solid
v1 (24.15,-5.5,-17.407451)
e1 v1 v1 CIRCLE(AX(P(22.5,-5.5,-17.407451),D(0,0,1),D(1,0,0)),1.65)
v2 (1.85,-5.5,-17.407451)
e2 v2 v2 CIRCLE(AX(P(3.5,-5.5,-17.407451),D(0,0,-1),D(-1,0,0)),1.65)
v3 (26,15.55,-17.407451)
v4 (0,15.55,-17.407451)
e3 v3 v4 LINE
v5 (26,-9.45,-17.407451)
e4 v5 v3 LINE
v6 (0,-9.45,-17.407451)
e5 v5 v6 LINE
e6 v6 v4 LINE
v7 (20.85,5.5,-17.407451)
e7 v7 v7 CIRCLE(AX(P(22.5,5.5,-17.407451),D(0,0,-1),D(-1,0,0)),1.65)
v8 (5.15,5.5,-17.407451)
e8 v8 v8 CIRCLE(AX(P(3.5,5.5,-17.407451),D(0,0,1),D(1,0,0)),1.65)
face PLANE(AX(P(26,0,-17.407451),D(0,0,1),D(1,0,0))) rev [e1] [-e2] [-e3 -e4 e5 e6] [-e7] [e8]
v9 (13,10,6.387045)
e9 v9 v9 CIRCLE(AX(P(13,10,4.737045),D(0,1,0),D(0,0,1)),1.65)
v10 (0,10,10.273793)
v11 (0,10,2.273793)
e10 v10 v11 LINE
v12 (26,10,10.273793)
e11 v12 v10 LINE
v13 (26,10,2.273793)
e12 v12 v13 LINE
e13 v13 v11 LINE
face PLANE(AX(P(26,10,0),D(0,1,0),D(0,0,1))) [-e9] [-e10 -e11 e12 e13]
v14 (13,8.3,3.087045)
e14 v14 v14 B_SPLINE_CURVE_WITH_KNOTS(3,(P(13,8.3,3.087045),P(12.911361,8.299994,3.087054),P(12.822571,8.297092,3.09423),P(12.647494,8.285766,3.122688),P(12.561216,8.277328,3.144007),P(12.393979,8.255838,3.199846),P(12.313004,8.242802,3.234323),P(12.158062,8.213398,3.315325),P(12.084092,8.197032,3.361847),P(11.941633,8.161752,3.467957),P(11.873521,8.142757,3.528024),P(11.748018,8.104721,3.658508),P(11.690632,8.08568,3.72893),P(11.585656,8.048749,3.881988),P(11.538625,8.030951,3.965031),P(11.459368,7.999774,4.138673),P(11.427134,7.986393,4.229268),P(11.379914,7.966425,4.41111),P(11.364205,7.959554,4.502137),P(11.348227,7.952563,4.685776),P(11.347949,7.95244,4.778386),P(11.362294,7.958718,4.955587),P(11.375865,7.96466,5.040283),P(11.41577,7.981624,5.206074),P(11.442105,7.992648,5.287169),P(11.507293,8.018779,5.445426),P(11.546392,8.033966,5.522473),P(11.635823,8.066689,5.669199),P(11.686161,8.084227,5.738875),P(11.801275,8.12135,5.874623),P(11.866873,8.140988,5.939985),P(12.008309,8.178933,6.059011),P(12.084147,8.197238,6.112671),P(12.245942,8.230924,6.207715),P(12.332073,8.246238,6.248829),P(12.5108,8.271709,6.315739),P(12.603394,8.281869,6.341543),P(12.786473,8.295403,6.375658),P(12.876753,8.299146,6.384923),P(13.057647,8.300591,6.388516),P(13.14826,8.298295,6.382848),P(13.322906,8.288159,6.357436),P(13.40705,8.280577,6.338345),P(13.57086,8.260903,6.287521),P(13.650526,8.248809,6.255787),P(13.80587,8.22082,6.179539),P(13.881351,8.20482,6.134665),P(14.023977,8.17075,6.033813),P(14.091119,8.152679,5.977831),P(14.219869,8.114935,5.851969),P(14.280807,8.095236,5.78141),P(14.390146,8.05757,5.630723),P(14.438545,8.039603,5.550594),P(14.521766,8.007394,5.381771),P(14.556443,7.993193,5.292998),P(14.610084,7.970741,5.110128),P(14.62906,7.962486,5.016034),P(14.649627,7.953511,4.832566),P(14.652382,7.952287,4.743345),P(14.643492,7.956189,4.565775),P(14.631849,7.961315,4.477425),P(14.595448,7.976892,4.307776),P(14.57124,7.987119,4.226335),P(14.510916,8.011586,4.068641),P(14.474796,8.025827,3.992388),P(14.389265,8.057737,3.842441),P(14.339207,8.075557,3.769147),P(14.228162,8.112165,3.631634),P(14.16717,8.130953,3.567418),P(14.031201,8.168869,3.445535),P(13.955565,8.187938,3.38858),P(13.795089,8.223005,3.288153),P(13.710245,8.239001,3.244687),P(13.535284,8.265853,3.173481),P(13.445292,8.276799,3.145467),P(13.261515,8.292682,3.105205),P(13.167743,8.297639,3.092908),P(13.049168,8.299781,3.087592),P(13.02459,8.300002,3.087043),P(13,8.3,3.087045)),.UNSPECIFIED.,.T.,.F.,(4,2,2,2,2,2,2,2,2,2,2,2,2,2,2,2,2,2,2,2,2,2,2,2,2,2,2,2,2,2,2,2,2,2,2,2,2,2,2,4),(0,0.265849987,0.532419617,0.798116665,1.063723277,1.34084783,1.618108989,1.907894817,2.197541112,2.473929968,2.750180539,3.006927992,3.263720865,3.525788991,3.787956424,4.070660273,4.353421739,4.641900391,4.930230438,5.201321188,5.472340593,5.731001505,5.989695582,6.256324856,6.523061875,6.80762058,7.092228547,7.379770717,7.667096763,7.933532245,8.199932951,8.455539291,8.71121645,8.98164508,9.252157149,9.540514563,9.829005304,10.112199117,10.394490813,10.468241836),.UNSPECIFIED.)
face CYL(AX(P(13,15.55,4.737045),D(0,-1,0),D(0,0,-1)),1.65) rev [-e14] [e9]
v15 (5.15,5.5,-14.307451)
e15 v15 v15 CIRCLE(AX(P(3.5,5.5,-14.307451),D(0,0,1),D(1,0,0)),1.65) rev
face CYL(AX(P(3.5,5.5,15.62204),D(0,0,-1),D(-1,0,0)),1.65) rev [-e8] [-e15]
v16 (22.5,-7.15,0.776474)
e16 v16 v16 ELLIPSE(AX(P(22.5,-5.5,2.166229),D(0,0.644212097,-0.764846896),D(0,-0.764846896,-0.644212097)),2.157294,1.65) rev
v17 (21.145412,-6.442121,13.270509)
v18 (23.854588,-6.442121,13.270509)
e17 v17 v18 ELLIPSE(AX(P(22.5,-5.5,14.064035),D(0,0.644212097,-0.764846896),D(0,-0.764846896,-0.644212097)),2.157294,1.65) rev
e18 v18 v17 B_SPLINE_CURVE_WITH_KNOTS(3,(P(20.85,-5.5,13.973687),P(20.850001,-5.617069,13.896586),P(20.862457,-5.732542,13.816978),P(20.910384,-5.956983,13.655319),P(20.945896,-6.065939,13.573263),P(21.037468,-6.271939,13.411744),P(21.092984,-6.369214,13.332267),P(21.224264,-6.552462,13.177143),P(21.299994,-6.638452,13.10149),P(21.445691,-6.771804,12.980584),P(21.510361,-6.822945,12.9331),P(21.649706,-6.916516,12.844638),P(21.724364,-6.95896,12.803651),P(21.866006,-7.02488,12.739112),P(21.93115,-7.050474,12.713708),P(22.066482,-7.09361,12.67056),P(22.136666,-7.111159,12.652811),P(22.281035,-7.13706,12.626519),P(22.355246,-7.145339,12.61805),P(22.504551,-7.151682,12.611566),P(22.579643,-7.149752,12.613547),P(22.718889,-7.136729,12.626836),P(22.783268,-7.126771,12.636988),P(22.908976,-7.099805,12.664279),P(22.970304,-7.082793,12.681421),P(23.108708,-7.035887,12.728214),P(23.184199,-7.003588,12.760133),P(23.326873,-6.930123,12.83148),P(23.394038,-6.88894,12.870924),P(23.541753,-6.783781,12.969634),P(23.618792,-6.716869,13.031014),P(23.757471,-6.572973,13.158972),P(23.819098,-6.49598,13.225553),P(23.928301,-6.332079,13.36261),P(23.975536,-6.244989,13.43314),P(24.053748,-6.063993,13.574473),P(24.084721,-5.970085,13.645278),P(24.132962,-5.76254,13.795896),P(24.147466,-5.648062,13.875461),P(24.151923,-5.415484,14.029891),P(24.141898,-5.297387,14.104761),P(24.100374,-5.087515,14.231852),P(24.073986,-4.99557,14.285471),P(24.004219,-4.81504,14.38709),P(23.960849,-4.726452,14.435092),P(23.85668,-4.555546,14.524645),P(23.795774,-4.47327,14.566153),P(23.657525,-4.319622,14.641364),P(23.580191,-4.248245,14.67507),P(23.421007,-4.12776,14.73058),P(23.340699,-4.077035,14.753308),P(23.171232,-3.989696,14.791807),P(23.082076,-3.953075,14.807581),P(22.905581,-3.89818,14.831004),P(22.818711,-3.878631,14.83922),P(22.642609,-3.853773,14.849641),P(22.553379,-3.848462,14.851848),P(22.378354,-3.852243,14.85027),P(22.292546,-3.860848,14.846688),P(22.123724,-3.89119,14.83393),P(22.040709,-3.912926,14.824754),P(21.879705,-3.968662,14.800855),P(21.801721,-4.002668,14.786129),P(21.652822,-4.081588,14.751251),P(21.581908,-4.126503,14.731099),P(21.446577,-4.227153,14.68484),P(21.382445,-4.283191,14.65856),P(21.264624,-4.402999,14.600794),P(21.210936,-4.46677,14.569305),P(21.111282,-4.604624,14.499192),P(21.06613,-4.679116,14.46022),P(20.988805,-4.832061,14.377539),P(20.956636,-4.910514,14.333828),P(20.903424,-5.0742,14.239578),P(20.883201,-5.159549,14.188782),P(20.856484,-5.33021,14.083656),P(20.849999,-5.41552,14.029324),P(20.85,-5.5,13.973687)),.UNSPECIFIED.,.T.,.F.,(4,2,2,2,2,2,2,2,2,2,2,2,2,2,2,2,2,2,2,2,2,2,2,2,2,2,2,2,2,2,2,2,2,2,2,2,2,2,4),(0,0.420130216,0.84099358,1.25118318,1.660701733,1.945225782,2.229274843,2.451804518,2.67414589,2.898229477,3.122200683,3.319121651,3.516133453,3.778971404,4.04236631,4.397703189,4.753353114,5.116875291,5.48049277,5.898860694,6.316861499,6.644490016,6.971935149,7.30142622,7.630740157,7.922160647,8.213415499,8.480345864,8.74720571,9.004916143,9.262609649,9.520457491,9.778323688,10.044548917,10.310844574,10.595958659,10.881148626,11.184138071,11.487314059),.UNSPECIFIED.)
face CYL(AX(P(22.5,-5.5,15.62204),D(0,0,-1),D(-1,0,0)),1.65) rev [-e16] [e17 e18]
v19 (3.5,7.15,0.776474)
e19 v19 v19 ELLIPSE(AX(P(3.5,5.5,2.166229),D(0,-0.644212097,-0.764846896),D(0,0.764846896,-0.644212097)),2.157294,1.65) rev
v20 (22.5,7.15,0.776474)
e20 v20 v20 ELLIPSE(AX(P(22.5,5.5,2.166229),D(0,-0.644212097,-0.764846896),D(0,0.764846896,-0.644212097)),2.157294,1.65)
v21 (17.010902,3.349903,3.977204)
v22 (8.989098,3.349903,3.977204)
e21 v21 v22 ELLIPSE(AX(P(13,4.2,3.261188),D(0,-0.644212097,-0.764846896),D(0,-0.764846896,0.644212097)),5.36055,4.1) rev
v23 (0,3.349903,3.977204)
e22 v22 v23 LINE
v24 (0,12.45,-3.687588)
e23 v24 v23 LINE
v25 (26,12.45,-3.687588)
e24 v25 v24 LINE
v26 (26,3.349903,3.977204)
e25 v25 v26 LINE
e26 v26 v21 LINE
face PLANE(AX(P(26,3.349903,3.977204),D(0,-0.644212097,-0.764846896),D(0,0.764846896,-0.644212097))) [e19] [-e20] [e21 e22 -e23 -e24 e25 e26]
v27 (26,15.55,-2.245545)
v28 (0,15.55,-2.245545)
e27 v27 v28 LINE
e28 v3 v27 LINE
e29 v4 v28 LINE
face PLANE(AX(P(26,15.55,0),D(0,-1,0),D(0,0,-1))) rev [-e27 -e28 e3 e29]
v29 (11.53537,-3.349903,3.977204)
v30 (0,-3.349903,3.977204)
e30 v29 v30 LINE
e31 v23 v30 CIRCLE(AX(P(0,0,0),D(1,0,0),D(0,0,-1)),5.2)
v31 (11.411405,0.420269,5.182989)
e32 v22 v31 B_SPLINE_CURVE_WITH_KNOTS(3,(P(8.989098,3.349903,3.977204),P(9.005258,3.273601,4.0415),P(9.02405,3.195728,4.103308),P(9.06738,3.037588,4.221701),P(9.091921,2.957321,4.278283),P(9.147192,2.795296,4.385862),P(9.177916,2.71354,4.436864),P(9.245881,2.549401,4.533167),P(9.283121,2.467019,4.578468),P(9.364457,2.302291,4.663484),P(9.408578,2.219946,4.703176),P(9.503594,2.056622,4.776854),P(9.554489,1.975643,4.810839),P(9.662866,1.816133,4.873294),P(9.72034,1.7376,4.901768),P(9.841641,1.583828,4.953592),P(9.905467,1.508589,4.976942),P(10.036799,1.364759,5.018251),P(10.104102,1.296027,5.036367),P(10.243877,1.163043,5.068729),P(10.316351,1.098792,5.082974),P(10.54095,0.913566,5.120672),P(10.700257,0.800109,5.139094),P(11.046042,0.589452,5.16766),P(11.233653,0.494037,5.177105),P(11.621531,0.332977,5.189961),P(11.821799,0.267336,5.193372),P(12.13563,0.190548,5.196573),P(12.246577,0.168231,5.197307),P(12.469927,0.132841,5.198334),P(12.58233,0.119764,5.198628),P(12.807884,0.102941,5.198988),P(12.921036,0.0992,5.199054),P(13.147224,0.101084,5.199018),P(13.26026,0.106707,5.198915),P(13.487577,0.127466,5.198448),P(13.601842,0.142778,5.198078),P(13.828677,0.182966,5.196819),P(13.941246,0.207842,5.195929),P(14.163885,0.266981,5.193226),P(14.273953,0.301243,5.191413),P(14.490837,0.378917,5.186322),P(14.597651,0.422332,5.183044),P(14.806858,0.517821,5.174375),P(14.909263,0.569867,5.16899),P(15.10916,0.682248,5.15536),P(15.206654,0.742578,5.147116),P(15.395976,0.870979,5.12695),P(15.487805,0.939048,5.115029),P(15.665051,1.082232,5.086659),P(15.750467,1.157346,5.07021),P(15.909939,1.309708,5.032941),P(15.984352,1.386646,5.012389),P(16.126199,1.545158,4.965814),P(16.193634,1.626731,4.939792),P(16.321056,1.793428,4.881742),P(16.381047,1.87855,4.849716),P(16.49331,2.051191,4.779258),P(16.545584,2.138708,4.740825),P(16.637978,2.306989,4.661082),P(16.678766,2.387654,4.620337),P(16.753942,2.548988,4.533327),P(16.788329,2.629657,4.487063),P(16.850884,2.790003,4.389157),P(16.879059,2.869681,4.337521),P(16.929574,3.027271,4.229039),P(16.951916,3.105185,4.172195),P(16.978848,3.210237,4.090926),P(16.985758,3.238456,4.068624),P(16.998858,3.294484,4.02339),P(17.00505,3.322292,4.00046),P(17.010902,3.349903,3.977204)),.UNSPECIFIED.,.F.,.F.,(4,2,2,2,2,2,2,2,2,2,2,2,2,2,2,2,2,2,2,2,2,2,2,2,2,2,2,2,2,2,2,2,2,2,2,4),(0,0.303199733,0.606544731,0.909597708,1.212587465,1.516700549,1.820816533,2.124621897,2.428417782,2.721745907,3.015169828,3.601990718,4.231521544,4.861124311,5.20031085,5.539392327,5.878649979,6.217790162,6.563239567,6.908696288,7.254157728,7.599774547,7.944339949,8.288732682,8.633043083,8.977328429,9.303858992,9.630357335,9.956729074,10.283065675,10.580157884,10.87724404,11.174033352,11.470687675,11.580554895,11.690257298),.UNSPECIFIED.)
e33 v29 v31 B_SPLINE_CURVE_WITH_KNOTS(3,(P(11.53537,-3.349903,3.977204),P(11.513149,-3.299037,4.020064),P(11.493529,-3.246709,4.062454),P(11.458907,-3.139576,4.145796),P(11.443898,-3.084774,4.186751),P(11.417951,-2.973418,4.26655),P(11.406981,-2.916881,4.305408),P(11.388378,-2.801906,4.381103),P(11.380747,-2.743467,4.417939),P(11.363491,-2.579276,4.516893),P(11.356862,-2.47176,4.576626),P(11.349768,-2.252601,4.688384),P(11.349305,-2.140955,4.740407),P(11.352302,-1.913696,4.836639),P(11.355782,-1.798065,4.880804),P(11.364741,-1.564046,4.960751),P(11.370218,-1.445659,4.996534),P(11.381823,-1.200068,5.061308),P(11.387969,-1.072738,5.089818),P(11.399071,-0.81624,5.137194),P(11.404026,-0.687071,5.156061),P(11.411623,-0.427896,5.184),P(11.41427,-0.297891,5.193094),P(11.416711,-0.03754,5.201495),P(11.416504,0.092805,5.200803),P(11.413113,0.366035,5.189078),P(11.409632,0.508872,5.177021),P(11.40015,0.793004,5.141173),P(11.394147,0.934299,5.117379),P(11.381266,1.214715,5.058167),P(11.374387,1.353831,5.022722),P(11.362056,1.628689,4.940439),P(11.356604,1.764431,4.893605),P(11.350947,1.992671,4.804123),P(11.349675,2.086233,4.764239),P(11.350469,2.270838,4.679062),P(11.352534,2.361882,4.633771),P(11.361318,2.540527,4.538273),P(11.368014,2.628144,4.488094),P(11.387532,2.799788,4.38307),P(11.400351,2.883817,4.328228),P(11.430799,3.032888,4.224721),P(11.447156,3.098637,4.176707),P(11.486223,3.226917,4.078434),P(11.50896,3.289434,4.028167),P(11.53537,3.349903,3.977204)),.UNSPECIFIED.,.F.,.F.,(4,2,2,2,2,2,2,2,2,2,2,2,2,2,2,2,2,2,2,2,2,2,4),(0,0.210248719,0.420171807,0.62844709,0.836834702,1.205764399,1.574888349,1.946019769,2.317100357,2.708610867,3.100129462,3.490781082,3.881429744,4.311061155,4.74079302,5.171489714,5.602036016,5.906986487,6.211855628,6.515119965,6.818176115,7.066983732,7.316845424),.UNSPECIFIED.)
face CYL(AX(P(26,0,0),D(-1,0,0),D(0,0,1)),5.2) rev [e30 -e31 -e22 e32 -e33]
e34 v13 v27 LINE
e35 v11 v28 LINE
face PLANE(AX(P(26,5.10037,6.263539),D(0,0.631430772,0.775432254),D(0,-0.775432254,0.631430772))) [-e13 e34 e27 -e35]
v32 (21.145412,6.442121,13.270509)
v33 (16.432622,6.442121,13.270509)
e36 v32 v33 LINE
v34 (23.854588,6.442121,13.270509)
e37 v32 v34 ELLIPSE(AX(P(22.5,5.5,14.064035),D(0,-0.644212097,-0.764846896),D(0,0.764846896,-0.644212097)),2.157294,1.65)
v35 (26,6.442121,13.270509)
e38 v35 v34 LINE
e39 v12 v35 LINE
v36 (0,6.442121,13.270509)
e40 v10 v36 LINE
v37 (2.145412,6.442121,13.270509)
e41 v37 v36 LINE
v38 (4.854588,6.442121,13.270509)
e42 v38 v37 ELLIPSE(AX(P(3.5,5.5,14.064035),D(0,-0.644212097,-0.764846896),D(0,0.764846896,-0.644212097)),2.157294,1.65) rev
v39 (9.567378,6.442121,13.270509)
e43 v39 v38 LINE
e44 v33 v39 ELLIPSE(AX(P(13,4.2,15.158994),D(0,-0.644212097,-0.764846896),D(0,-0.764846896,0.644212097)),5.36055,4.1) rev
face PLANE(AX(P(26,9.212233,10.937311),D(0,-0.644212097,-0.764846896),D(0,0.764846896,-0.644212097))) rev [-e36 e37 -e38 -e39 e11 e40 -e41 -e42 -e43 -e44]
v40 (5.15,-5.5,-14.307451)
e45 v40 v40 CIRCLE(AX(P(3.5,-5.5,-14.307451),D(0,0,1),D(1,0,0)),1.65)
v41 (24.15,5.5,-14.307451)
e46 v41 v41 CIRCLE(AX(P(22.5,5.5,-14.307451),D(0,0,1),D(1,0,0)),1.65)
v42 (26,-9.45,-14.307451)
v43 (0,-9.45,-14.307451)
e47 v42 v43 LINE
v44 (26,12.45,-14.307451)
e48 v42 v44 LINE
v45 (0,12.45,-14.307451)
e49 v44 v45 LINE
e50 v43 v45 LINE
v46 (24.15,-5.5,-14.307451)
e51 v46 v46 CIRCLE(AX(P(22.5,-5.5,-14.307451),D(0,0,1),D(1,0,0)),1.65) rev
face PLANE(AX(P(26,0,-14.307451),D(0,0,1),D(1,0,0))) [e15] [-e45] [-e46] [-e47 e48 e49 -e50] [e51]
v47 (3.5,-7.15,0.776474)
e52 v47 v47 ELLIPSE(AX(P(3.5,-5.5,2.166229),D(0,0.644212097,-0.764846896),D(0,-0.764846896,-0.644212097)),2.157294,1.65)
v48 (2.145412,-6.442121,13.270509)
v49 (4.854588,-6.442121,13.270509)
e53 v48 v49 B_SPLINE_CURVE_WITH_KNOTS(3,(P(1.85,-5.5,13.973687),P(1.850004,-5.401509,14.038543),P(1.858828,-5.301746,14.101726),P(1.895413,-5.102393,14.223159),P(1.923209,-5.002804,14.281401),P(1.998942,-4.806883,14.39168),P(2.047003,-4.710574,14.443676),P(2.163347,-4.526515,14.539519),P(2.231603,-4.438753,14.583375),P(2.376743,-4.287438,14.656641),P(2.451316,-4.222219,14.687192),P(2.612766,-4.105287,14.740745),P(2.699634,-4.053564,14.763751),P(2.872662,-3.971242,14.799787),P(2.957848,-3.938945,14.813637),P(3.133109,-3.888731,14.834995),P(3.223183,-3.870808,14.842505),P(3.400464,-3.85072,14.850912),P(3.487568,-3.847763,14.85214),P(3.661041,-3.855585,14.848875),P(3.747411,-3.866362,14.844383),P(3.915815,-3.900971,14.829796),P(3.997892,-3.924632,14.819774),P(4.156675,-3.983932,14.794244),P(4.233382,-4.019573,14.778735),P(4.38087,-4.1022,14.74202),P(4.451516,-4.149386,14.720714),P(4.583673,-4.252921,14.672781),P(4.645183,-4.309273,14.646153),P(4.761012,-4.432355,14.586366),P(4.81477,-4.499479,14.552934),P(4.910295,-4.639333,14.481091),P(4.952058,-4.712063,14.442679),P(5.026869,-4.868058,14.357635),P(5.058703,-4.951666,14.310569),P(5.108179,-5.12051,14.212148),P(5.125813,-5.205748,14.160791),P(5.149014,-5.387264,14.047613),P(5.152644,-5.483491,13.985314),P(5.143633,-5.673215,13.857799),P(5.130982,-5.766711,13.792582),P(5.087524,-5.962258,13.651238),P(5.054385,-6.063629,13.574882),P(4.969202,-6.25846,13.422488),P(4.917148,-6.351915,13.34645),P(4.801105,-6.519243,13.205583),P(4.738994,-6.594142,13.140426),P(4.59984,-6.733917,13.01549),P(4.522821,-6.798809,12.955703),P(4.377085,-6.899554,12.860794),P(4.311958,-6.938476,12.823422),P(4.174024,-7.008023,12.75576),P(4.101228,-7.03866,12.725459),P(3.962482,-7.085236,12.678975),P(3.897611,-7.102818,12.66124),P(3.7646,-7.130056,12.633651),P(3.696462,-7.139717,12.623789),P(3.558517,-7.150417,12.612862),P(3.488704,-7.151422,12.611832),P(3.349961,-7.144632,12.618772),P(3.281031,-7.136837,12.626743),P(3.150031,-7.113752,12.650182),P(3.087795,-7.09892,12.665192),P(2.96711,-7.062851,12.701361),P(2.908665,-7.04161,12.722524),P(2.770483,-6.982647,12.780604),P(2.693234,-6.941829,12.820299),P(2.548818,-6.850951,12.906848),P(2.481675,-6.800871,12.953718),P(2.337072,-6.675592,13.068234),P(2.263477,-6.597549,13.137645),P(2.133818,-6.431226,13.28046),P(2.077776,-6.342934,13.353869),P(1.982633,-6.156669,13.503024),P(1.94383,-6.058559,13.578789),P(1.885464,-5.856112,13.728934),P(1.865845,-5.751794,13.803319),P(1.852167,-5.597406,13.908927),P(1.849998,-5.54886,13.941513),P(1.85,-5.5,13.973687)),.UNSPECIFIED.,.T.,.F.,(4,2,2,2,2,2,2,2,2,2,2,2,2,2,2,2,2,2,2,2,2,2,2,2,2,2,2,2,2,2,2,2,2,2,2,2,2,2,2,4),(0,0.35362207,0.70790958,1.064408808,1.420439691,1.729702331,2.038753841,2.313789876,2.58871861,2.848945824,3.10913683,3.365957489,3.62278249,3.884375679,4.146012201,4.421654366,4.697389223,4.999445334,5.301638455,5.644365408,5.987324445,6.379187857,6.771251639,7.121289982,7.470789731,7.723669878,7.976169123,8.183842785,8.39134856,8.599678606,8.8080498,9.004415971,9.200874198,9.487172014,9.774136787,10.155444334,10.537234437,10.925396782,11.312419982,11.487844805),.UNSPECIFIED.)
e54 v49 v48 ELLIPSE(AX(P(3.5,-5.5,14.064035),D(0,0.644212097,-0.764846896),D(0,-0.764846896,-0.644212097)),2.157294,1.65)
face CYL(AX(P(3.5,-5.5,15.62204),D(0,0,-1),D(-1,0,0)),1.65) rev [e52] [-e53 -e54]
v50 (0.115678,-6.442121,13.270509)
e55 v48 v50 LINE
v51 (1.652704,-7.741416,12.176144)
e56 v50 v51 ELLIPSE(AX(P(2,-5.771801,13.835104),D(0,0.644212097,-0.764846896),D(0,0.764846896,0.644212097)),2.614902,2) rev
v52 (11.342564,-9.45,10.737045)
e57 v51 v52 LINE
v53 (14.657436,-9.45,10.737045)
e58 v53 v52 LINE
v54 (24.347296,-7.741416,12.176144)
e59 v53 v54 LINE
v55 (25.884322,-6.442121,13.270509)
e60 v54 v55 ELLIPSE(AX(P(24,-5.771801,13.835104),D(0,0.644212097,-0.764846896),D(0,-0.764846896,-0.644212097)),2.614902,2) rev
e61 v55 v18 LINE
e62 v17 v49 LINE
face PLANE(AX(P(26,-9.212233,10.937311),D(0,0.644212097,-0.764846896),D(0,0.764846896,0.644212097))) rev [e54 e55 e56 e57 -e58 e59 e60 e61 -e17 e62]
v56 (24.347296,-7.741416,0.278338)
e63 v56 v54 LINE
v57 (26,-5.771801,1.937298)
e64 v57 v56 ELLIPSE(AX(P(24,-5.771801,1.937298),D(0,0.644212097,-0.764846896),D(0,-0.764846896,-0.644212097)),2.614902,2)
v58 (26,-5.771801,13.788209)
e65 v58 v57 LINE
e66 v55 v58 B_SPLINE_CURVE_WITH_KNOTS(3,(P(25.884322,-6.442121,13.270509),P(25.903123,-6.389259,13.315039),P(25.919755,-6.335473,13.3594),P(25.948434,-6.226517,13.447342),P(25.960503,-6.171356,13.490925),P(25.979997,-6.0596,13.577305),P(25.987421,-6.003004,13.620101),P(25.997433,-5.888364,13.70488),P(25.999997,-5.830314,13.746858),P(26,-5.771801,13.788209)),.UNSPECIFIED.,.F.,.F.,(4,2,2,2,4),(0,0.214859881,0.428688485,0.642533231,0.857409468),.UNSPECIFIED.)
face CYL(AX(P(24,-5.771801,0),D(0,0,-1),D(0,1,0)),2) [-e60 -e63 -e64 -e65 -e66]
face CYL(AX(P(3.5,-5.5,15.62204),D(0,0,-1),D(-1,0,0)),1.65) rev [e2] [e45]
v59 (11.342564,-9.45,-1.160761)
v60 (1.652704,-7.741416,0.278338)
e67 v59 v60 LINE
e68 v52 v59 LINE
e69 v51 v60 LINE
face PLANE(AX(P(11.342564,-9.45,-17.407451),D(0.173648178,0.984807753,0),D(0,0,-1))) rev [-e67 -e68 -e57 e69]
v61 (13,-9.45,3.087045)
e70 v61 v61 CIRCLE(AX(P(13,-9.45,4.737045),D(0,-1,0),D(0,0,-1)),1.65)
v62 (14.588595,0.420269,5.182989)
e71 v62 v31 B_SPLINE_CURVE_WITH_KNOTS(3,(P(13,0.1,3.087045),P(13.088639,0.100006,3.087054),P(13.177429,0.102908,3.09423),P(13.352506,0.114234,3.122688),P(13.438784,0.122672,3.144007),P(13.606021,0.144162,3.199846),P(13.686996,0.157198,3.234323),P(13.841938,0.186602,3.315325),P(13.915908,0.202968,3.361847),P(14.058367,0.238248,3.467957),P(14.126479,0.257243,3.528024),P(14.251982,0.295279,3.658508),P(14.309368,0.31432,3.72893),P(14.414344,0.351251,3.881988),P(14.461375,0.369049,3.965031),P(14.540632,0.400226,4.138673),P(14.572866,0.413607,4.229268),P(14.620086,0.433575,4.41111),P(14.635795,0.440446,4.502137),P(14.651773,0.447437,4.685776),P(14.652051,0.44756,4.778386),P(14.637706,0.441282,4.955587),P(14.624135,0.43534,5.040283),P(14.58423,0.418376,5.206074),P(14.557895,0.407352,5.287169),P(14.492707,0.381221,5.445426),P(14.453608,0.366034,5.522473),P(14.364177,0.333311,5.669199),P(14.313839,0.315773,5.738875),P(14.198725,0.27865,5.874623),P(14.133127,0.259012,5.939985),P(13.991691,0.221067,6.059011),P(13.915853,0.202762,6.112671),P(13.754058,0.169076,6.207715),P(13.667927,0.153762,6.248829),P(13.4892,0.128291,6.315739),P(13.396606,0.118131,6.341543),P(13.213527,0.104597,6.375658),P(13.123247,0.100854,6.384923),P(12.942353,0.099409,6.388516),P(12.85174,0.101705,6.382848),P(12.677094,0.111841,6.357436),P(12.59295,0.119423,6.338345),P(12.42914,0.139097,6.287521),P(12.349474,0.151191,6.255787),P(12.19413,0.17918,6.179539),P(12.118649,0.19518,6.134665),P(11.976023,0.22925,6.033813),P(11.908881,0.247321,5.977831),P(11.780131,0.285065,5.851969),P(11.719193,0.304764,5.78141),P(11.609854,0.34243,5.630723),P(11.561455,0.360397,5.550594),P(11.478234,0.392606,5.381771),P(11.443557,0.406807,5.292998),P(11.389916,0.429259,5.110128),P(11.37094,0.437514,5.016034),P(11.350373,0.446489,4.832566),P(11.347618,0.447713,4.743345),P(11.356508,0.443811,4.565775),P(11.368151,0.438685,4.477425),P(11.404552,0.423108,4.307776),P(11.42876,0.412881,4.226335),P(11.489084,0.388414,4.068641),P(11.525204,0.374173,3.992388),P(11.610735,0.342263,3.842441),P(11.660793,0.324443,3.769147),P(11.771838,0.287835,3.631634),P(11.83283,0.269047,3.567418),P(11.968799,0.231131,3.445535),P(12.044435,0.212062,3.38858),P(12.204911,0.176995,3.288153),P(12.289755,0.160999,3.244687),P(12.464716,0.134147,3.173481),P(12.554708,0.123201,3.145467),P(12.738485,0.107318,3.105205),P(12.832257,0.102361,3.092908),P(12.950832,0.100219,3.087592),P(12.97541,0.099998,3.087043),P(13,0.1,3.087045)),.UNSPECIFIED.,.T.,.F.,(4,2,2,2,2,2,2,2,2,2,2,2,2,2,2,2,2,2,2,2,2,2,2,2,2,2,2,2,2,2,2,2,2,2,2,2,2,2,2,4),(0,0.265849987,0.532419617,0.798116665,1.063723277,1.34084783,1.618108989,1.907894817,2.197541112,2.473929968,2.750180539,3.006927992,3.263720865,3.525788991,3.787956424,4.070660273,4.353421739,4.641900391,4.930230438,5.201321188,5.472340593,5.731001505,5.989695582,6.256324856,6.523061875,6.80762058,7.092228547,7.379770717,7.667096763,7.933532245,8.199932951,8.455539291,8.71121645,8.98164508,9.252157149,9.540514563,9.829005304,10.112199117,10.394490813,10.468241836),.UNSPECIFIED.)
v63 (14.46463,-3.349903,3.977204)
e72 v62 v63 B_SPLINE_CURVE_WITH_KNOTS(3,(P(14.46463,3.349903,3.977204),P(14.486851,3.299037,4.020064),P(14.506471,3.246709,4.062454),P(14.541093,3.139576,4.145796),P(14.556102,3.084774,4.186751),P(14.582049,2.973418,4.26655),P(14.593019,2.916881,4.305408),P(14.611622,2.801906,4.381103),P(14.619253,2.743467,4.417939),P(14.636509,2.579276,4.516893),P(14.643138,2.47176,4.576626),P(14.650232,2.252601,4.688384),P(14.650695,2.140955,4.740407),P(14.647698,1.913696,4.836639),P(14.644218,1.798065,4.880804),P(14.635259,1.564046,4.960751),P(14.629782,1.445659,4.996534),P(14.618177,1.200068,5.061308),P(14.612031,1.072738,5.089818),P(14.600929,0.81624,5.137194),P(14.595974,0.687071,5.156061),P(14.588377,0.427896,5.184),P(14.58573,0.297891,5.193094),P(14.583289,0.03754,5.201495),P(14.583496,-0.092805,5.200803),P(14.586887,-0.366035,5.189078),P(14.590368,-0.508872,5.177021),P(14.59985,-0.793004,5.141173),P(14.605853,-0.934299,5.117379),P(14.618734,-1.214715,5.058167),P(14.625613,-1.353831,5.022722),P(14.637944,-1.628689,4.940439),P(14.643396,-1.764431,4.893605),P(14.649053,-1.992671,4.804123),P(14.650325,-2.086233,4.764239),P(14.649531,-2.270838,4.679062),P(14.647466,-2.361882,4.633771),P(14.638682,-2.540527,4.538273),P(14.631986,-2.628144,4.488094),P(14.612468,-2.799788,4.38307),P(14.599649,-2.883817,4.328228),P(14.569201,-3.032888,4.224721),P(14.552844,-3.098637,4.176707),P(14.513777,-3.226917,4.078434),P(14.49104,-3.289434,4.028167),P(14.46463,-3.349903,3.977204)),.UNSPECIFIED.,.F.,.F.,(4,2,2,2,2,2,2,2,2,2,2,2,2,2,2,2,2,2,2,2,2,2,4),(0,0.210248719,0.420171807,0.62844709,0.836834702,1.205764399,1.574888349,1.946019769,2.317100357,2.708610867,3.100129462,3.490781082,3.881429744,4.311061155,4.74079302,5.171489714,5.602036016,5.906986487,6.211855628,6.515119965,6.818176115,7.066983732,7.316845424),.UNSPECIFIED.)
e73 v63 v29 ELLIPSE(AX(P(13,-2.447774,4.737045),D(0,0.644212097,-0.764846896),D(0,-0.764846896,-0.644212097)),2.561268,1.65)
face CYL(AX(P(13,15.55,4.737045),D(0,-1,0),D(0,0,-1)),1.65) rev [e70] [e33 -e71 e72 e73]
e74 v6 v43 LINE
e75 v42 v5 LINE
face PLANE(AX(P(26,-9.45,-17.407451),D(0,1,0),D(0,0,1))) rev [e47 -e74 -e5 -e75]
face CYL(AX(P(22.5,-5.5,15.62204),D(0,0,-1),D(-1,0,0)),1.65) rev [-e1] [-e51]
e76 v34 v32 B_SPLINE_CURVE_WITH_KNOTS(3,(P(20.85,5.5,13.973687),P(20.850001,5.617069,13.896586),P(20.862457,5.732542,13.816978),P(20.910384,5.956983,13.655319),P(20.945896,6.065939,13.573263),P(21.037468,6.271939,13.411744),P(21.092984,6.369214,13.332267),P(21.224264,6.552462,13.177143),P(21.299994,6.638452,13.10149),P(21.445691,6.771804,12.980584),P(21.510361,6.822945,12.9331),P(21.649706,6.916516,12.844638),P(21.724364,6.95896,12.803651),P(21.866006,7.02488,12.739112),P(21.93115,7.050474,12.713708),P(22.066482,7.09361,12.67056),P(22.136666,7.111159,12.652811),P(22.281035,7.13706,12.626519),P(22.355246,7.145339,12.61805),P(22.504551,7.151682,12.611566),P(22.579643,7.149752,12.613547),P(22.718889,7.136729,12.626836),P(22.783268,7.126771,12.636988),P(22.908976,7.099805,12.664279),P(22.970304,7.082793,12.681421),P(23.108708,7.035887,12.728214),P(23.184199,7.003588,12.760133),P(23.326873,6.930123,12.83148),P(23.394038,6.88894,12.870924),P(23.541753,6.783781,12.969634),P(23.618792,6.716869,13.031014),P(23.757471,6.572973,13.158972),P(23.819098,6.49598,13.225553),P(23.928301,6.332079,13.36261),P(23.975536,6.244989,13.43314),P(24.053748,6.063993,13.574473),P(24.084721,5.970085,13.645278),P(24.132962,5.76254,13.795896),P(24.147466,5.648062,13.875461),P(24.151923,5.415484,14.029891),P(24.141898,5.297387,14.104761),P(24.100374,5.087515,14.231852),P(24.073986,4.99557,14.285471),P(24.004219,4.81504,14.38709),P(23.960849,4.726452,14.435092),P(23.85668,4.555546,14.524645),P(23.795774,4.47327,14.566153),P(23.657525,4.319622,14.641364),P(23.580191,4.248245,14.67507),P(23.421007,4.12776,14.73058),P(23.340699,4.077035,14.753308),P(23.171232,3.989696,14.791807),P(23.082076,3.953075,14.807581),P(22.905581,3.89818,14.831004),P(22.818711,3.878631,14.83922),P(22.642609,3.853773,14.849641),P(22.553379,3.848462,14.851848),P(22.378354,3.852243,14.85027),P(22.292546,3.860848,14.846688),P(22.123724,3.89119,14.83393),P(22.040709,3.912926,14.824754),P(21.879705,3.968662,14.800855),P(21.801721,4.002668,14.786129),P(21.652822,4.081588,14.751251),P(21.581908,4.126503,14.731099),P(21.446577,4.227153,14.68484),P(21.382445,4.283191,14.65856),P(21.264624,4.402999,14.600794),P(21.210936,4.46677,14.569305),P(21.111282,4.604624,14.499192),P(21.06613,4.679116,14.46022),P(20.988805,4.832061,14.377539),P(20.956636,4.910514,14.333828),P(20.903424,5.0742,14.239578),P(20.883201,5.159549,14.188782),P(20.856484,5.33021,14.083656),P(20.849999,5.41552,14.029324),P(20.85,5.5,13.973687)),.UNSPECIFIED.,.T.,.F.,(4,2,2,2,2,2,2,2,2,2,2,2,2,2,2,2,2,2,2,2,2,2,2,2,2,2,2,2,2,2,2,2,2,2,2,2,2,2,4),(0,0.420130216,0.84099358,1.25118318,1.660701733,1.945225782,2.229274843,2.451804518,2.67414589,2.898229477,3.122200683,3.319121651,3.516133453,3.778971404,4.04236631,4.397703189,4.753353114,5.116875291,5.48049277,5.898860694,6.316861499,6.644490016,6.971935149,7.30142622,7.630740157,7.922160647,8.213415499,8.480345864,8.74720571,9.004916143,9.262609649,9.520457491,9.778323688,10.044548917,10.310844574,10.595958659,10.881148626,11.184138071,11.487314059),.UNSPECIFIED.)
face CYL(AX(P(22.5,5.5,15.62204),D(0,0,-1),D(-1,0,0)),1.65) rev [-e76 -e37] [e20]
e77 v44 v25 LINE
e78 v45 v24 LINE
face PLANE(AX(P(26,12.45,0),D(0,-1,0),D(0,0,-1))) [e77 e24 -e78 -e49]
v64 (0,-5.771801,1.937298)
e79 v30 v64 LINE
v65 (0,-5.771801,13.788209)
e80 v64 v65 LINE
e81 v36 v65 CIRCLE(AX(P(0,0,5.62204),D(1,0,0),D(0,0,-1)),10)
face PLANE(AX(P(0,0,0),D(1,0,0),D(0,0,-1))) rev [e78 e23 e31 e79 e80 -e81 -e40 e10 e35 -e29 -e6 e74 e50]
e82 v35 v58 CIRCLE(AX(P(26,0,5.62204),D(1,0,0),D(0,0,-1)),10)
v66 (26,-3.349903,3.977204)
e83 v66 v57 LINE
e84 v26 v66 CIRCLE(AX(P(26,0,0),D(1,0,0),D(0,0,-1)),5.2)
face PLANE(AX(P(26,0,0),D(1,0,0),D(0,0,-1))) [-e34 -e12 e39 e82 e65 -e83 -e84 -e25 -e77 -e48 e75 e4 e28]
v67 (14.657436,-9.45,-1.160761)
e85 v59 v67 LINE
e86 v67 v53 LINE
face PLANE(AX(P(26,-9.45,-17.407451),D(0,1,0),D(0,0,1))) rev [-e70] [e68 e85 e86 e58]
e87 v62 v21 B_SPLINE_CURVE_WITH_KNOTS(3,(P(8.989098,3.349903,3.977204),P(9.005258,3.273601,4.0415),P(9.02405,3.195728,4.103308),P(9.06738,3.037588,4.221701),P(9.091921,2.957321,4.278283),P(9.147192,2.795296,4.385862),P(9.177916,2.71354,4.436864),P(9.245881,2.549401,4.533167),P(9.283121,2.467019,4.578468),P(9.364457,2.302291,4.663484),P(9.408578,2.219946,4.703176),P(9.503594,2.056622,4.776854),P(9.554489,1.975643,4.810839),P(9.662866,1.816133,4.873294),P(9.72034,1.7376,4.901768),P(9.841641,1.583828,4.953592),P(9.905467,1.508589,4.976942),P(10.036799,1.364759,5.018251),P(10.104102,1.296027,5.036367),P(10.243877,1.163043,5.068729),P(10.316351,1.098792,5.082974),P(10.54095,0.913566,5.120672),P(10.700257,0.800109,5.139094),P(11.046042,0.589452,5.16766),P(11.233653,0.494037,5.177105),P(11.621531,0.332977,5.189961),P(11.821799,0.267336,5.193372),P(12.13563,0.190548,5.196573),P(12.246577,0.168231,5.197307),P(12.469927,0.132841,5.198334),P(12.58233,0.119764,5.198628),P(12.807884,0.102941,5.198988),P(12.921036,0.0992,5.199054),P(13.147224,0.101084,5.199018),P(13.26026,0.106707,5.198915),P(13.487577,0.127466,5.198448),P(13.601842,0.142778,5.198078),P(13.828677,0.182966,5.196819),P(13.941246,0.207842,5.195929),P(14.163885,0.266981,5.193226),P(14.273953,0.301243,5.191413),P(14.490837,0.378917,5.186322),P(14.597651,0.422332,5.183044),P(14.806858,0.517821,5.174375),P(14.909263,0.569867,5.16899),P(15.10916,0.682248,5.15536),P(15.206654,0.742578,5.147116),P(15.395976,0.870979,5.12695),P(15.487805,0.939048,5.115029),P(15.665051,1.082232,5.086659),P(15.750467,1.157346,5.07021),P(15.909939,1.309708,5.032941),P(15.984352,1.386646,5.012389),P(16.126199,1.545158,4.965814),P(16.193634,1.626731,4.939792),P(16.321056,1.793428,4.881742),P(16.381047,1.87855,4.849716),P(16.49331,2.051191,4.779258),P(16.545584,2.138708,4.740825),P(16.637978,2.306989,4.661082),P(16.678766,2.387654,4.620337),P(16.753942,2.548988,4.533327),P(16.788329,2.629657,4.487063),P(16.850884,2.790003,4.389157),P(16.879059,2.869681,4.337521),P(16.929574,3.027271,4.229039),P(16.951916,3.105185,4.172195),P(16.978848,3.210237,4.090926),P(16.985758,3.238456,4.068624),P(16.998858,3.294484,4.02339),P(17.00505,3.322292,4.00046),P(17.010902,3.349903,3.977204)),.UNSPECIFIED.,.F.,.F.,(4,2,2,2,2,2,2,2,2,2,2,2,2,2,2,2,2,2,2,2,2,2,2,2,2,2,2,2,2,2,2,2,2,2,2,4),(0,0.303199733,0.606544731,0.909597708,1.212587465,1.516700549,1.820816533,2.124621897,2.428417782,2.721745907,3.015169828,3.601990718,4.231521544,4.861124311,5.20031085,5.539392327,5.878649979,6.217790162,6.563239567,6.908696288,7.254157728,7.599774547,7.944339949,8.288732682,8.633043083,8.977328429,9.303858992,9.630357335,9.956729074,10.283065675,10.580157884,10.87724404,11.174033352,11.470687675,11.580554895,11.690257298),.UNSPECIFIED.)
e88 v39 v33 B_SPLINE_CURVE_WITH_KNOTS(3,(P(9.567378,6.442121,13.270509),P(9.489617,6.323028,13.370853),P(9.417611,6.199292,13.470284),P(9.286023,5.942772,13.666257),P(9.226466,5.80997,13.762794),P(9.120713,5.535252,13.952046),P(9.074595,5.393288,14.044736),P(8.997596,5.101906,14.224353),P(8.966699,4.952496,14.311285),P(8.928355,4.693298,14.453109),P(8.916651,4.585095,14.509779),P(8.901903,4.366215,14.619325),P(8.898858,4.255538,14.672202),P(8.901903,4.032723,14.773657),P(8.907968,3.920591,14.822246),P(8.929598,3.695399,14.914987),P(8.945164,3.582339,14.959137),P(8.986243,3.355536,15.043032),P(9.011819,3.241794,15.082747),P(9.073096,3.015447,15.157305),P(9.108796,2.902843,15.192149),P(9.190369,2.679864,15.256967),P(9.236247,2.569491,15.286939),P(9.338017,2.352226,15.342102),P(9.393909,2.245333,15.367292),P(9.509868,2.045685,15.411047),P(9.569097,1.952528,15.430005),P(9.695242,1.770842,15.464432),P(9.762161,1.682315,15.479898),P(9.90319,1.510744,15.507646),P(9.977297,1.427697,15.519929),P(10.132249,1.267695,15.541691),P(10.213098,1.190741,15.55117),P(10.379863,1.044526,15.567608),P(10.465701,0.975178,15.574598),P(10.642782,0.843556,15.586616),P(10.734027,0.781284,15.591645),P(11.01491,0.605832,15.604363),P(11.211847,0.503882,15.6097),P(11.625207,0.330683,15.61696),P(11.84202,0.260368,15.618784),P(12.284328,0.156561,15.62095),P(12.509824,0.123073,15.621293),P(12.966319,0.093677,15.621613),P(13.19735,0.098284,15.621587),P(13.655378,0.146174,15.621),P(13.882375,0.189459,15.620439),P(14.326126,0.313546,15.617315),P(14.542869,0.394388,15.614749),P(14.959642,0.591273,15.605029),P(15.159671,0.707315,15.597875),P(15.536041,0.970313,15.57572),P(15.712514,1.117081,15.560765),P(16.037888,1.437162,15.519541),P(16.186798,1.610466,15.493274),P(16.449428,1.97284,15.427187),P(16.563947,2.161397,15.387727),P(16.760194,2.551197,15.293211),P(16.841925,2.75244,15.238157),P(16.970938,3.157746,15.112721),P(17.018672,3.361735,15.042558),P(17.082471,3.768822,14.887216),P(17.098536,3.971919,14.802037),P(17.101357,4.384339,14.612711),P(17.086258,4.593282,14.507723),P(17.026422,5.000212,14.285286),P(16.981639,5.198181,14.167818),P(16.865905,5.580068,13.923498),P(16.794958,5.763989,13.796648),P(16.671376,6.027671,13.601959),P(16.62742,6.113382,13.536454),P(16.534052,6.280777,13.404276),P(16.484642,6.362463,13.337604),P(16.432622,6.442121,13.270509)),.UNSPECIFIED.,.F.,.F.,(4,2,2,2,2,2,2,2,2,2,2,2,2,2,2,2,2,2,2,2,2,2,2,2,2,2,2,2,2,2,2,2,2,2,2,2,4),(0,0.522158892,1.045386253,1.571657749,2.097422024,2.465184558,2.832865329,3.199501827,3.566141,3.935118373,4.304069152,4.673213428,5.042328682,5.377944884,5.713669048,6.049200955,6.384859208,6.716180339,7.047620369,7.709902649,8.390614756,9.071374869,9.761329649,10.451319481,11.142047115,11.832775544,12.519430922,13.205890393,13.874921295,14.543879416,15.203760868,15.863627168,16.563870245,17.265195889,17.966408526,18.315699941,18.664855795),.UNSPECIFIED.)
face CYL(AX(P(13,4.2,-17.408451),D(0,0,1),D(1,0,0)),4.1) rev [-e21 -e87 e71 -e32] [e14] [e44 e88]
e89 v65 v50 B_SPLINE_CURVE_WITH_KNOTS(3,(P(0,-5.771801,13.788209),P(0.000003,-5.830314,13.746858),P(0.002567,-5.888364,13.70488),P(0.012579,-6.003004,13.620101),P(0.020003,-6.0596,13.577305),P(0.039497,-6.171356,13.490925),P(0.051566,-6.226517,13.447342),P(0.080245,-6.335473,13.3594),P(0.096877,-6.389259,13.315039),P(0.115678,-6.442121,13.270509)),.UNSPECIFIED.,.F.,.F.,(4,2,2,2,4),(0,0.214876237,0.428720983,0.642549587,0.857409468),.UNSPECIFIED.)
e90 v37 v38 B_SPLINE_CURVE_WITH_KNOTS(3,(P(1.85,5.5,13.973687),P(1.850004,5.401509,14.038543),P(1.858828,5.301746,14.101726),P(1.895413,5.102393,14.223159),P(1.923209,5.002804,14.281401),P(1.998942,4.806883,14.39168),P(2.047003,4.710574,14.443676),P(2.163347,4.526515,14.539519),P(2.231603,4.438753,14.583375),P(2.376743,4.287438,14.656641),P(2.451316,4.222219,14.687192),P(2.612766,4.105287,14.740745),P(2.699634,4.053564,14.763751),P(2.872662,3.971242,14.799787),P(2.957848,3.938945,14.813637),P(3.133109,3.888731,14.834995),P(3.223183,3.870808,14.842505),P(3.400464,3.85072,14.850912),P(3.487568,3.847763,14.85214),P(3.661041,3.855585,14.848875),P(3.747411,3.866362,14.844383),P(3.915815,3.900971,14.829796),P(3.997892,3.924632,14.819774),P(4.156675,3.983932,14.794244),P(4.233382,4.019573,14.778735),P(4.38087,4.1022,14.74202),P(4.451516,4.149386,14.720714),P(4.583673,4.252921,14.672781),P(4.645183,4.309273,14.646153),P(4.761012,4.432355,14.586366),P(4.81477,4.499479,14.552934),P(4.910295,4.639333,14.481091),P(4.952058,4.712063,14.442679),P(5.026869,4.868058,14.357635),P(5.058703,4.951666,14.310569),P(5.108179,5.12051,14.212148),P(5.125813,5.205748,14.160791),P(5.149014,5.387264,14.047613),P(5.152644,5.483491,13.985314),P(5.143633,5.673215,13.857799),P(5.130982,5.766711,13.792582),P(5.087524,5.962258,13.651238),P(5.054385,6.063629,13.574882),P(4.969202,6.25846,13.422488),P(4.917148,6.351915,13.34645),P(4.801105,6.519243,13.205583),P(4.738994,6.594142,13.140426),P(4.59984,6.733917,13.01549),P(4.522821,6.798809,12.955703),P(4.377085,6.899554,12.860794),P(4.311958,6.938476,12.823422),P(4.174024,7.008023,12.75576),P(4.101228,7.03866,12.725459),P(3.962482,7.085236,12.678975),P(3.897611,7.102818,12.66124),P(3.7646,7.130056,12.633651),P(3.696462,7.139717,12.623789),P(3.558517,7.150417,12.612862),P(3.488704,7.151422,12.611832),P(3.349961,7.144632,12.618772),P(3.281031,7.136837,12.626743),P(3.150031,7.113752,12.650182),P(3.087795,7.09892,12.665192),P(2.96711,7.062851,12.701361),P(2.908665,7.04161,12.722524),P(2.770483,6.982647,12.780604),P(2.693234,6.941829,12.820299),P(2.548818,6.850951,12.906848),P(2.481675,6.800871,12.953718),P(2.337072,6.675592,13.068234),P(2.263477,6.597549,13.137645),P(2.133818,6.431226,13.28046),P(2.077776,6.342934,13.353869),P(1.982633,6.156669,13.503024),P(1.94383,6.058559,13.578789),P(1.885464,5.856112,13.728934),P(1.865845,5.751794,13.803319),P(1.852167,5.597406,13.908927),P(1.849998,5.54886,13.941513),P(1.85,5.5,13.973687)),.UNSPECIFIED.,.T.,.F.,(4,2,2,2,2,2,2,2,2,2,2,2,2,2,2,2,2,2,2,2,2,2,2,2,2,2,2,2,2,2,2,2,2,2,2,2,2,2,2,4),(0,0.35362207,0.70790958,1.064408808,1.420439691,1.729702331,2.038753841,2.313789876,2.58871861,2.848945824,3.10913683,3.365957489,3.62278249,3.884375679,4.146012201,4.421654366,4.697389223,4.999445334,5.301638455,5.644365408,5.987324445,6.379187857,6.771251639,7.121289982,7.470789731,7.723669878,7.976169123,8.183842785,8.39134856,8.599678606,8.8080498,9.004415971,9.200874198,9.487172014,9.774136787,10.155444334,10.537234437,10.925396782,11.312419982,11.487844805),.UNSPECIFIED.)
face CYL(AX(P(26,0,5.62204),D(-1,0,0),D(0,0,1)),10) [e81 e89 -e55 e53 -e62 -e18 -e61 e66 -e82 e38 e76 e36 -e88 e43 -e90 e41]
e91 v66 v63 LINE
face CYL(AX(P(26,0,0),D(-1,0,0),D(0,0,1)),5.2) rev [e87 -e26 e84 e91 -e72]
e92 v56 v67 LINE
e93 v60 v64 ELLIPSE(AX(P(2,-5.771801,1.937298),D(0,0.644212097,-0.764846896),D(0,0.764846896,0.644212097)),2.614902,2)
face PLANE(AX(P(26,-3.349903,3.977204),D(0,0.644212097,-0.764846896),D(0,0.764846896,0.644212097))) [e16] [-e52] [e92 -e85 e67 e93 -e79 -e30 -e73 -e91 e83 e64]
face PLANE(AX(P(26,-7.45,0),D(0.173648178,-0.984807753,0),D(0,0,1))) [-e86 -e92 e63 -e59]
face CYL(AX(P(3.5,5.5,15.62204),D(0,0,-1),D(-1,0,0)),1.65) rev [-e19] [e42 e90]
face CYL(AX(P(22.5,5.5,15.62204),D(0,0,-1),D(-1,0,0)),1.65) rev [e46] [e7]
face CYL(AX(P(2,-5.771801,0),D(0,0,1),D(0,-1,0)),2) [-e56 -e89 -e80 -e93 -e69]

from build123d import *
from OCP.BRepFilletAPI import BRepFilletAPI_MakeChamfer

# Parameters (mm, degrees)
EXTRUDE_1_DEPTH     = 26
SKETCH_2_R          = 1.65
CUT_EXTRUDE_1_DEPTH = 45.819078563
SKETCH_3_W          = 28.1444964
SKETCH_3_H          = 6.1
CUT_EXTRUDE_2_DEPTH = 35.940261345
CUT_EXTRUDE_4_REACH = 46.819
SKETCH_5_R          = 4.1
SKETCH_6_R          = 1.65
CUT_EXTRUDE_5_DEPTH = 41.050210522
CHAMFER_1_SIZE      = 2
CHAMFER_1_SIZE2     = 11.342563639
FILLET_1_R          = 2


with BuildPart() as part:
    # 草图1 → 凸台-拉伸1 (new body)
    with BuildSketch(Plane(origin=(0, 0, 0), x_dir=(0, 0, -1), z_dir=(1, 0, 0))):
        with BuildLine():
            Line((17.407451211, 15.55), (2.245544981, 15.55))
            Line((2.245544981, 15.55), (-2.273793452, 10))
            Line((-2.273793452, 10), (-10.273793452, 10))
            Line((-10.273793452, 10), (-13.270509165, 6.44212097))
            ThreePointArc((-13.270509165, 6.44212097), (-15.622040206, 0), (-13.270509165, -6.44212097))
            Line((-13.270509165, -6.44212097), (-10.273793452, -10))
            Line((-10.273793452, -10), (-2.273793452, -10))
            Line((-2.273793452, -10), (2.245544981, -15.55))
            Line((2.245544981, -15.55), (17.407451211, -15.55))
            Line((17.407451211, -15.55), (17.407451211, 15.55))
        make_face()
        with BuildLine():
            Line((3.687588487, 12.45), (14.307451211, 12.45))
            Line((14.307451211, 12.45), (14.307451211, -12.45))
            Line((14.307451211, -12.45), (3.687588487, -12.45))
            Line((3.687588487, -12.45), (-3.977203858, -3.349902904))
            ThreePointArc((-3.977203858, -3.349902904), (-5.2, 0), (-3.977203858, 3.349902904))
            Line((-3.977203858, 3.349902904), (3.687588487, 12.45))
        make_face(mode=Mode.SUBTRACT)
    extrude(amount=EXTRUDE_1_DEPTH)

    # 草图2 → 切除-拉伸1 (cut, through all)
    with BuildSketch(Plane(origin=(0, 0, -17.407451211), x_dir=(-1, 0, 0), z_dir=(0, 0, -1))):
        with Locations((-22.5, 5.5)):
            Circle(SKETCH_2_R)
        with Locations(Location((-22.5, -5.5, 0), (0, 0, 325.181239638))):
            Circle(SKETCH_2_R)
        with Locations(Location((-3.5, -5.5, 0), (0, 0, 325.181239638))):
            Circle(SKETCH_2_R)
        with Locations(Location((-3.5, 5.5, 0), (0, 0, 180))):
            Circle(SKETCH_2_R)
    extrude(amount=-CUT_EXTRUDE_1_DEPTH, mode=Mode.SUBTRACT)

    # 草图3 → 切除-拉伸2 (cut, through all)
    with BuildSketch(Plane.ZY):
        with Locations((-3.335203011, -12.5)):
            Rectangle(SKETCH_3_W, SKETCH_3_H)
    extrude(amount=-CUT_EXTRUDE_2_DEPTH, mode=Mode.SUBTRACT)

    # 草图5 → 切除-拉伸4 (cut, up to next)
    with BuildSketch(Plane.XY.offset(15.622040206), mode=Mode.PRIVATE) as cut_extrude_4_sk1:
        with Locations(Location((13, 4.2, 0), (0, 0, 348.033440949))):
            Circle(SKETCH_5_R)
    cut_extrude_4_tool1 = extrude(cut_extrude_4_sk1.sketch, amount=-CUT_EXTRUDE_4_REACH, mode=Mode.PRIVATE) & part.part
    add(cut_extrude_4_tool1.solids().sort_by_distance((13, 4.2, 15.62204))[0], mode=Mode.SUBTRACT)

    # 草图6 → 切除-拉伸5 (cut, through all)
    with BuildSketch(Plane.XZ.offset(9.45)):
        with Locations(Location((13, 4.737045189, 0), (0, 0, 270))):
            Circle(SKETCH_6_R)
    extrude(amount=-CUT_EXTRUDE_5_DEPTH, mode=Mode.SUBTRACT)

    # 倒角1: one chamfer whose edges measure the first distance from different faces: ONE call of the kernel's chamfer builder (chamfer() names one face for all edges)
    chamfer_1_edges_1 = [part.edges().sort_by_distance(p)[0] for p in [
        (0, -9.45, 4.78814218),
    ]]
    chamfer_1_side_1 = [part.faces().sort_by_distance(p)[0] for p in [
        (0, -9.035760057, -15.857451211),
    ]]
    chamfer_1_edges_2 = [part.edges().sort_by_distance(p)[0] for p in [
        (26, -9.45, 4.78814218),
    ]]
    chamfer_1_side_2 = [part.faces().sort_by_distance(p)[0] for p in [
        (26, -9.035760057, -15.857451211),
    ]]
    chamfer_1 = BRepFilletAPI_MakeChamfer(part.part.solid().wrapped)
    for e in chamfer_1_edges_1:
        chamfer_1.Add(CHAMFER_1_SIZE, CHAMFER_1_SIZE2, e.wrapped, chamfer_1_side_1[0].wrapped)  # the first distance lies on this face
    for e in chamfer_1_edges_2:
        chamfer_1.Add(CHAMFER_1_SIZE, CHAMFER_1_SIZE2, e.wrapped, chamfer_1_side_2[0].wrapped)  # the first distance lies on this face
    add(Compound.cast(chamfer_1.Shape()), mode=Mode.REPLACE)

    # 圆角1
    # the kernel refuses this fillet: 2 mm, written as the material it takes off along each edge
    with BuildSketch(Plane(origin=(26, -7.45, -3.671707212), x_dir=(-0.9848077530122086, -0.17364817766692747, 0), z_dir=(0, 0, 1))) as fillet_1_piece_1:
        with BuildLine():
            CenterArc((FILLET_1_R * 0.839099631177, -FILLET_1_R), FILLET_1_R, 90, 80)
            Line((-FILLET_1_R * 0.145708121835, -FILLET_1_R * 0.826351822333), (0, 0))
            Line((0, 0), (FILLET_1_R * 0.839099631177, 0))
        make_face()
    extrude(amount=20.288802329, mode=Mode.SUBTRACT)
    with BuildSketch(Plane(origin=(0, -7.45, 16.617095117), x_dir=(0, 1, 0), z_dir=(0, 0, -1))) as fillet_1_piece_2:
        with BuildLine():
            CenterArc((FILLET_1_R * 0.839099631177, FILLET_1_R), FILLET_1_R, 190, 80)
            Line((-FILLET_1_R * 0.145708121835, FILLET_1_R * 0.826351822333), (0, 0))
            Line((0, 0), (FILLET_1_R * 0.839099631177, 0))
        make_face()
    extrude(amount=20.288802329, mode=Mode.SUBTRACT)


solid = part.part
